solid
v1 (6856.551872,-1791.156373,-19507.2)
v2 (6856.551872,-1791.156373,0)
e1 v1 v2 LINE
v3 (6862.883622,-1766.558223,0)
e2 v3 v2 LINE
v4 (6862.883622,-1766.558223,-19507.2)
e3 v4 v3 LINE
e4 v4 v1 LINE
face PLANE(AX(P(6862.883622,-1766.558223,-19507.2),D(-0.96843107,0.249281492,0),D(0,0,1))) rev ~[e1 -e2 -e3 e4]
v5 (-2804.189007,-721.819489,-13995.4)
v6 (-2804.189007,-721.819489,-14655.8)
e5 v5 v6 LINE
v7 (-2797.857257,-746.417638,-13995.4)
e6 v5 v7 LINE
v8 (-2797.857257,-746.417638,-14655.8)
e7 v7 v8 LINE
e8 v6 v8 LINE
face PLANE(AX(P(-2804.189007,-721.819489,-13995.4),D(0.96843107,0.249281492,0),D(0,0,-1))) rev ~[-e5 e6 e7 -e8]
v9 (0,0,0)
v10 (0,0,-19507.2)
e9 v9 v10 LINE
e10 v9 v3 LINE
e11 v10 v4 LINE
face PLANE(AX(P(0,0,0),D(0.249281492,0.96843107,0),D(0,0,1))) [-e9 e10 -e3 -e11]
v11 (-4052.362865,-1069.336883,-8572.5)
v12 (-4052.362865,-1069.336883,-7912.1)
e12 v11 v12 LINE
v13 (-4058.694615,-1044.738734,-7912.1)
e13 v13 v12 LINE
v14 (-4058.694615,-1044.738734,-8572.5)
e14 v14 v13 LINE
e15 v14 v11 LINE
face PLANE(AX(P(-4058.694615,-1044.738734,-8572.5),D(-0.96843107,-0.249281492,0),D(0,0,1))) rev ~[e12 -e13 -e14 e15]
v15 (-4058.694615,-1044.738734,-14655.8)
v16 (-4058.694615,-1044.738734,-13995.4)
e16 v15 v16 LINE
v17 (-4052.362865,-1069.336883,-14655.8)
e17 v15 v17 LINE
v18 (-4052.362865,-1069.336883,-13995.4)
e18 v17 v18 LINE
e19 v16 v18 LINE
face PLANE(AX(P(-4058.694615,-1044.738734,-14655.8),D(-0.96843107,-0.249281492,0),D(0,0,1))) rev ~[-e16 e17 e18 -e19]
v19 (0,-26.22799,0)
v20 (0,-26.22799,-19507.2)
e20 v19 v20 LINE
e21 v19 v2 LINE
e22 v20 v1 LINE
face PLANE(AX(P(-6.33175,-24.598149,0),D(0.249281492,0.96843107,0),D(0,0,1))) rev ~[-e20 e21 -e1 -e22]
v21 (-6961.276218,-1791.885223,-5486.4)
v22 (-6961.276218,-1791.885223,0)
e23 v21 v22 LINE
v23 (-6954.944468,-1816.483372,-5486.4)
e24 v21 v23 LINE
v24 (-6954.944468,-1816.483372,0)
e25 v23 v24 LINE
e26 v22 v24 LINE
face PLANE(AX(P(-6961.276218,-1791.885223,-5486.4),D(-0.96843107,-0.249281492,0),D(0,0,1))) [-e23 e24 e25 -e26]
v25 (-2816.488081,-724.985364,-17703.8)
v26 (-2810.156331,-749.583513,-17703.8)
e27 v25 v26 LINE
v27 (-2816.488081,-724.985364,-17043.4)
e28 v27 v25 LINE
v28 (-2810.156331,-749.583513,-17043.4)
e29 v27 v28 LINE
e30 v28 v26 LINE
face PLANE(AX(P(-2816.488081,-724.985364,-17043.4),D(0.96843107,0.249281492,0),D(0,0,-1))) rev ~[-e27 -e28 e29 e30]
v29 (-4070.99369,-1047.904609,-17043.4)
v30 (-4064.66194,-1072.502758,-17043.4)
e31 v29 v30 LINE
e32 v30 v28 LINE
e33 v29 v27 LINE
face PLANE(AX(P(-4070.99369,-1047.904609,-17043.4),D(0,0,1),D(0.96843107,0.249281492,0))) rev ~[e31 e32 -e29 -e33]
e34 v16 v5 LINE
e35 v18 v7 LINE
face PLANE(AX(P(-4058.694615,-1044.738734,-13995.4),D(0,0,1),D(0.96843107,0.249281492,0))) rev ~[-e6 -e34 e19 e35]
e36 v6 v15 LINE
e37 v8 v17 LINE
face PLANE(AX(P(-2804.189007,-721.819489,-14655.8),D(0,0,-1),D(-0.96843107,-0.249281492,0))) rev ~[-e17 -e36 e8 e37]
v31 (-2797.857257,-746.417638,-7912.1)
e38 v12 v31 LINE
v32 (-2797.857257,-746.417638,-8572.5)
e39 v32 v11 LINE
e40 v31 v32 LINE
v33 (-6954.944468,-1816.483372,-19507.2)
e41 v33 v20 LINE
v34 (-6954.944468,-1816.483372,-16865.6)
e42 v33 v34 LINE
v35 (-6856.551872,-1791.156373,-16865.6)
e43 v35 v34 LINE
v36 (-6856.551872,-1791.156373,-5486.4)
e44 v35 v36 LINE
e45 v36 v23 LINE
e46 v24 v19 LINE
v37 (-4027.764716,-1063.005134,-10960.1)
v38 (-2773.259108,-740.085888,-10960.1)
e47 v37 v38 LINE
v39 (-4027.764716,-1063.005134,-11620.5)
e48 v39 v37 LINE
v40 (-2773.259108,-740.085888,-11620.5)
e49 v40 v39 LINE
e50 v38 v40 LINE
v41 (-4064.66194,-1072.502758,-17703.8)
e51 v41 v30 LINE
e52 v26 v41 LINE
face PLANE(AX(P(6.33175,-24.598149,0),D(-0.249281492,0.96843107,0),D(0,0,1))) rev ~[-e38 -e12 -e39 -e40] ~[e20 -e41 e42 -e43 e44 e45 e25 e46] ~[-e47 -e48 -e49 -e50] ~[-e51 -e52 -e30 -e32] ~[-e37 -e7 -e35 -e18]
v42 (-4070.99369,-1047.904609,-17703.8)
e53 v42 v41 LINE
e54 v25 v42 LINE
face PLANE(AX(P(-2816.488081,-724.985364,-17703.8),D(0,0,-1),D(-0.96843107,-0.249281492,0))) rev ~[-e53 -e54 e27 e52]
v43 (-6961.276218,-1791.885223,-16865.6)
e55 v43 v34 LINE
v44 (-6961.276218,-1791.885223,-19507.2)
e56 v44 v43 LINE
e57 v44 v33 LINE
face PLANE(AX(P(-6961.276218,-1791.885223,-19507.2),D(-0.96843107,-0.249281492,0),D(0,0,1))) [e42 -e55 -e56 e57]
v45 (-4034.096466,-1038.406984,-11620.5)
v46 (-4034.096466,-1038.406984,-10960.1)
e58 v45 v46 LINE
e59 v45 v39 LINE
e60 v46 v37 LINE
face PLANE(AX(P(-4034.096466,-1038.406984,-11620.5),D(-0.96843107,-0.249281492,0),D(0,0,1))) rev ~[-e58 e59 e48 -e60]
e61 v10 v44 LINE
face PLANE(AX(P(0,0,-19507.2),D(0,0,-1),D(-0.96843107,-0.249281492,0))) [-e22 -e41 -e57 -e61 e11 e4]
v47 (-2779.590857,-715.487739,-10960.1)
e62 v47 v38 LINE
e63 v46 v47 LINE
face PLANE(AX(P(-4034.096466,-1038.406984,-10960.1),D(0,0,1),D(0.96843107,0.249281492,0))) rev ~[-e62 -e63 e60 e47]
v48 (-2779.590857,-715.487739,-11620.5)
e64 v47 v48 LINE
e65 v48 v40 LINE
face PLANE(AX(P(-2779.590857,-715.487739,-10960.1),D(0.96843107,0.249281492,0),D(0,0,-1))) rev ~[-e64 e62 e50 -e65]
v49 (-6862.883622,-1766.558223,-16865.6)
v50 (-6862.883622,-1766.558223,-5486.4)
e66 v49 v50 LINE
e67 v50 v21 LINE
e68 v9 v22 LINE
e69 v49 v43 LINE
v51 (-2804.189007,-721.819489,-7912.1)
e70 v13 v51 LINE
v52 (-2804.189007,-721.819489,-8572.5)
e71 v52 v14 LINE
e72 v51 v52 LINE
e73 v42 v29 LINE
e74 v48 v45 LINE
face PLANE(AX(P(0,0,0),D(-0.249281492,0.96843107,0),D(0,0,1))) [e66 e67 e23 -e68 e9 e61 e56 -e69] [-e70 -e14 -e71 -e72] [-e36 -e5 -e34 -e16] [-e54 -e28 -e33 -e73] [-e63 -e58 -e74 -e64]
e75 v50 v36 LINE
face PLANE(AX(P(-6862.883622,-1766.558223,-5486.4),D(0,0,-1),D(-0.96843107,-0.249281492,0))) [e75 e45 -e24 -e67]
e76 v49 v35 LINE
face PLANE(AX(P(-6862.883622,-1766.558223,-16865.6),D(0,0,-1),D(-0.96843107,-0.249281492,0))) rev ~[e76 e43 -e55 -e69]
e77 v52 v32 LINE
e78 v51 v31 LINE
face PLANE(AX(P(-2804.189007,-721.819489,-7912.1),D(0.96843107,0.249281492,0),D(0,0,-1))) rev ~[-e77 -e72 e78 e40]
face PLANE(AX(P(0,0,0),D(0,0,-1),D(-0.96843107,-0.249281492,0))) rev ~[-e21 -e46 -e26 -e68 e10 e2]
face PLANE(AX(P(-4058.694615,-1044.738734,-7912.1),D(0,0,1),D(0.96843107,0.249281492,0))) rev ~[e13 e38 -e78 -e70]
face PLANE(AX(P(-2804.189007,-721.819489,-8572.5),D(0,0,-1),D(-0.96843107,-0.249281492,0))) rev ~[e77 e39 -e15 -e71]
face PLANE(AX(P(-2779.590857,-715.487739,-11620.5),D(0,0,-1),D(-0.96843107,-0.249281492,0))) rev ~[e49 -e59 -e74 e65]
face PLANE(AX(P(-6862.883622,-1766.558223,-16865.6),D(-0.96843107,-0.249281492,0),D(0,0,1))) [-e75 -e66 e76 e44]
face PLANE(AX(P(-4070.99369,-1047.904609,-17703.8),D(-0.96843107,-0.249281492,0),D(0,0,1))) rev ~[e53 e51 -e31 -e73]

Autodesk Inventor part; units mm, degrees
ref_plane "YZ Plane" through (0, 0, 0) normal (1, 0, 0) x (0, 1, 0)
ref_plane "XY Plane" through (0, 0, 0) normal (0, 0, 1) x (1, 0, 0)
ref_plane "southPlaneOfRoof" through (0, 0, 0) normal (-0.2492815, 0.9684311, 0) x (0, 0, 1)
ref_plane "norhtPlaneOfRoof" through (0, 0, 0) normal (0.2492815, 0.9684311, 0) x (0, 0, 1)
sketch "Sketch3" plane through (0, 0, 0) normal (-0.2492815, 0.9684311, 0) x (0, 0, 1)
  line L0 (0, 0) -> (-19507.2, 0)
  line L1 (-19507.2, 0) -> (-19507.2, -7086.6)
  line L2 (0, 0) -> (0, -7086.6)
  line L3 (0, -7086.6) -> (0, -25.4)
  line L4 (-19507.2, -7086.6) -> (0, -7086.6)
  line L5 (-17703.8, -4203.7) -> (-17043.4, -4203.7)
  line L6 (-17043.4, -4203.7) -> (-17043.4, -2908.3)
  line L7 (-17043.4, -2908.3) -> (-17703.8, -2908.3)
  line L8 (-17703.8, -2908.3) -> (-17703.8, -4203.7)
  line L9 (-14655.8, -4191) -> (-13995.4, -4191)
  line L10 (-13995.4, -4191) -> (-13995.4, -2895.6)
  line L11 (-13995.4, -2895.6) -> (-14655.8, -2895.6)
  line L12 (-14655.8, -2895.6) -> (-14655.8, -4191)
  line L13 (-11620.5, -4165.6) -> (-10960.1, -4165.6)
  line L14 (-10960.1, -4165.6) -> (-10960.1, -2870.2)
  line L15 (-10960.1, -2870.2) -> (-11620.5, -2870.2)
  line L16 (-11620.5, -2870.2) -> (-11620.5, -4165.6)
  line L17 (-8572.5, -4191) -> (-7912.1, -4191)
  line L18 (-7912.1, -4191) -> (-7912.1, -2895.6)
  line L19 (-7912.1, -2895.6) -> (-8572.5, -2895.6)
  line L20 (-8572.5, -2895.6) -> (-8572.5, -4191)
  line L21 (0, -7086.6) -> (0, -7188.2)
  line L22 (-5486.4, -7086.6) -> (-5486.4, -7188.2)
  line L23 (-5486.4, -7188.2) -> (0, -7188.2)
  line L24 (-19507.2, -7086.6) -> (-19507.2, -7188.2)
  line L25 (-16865.6, -7086.6) -> (-16865.6, -7188.2)
  line L26 (-19507.2, -7188.2) -> (-16865.6, -7188.2)
  dimension "d9" = 19507.2
  dimension "d10" = 7086.6
  dimension "d11" = 7061.2
  dimension "d15" = 660.4
  dimension "d16" = 1295.4
  dimension "d17" = 1803.4
  dimension "d18" = 2387.6
  dimension "d19" = 2374.9
  dimension "d20" = 2387.6
  dimension "d21" = 2908.3
  dimension "d22" = 2895.6
  dimension "d23" = 2870.2
  dimension "d24" = 2895.6
  dimension "d29" = 101.6
  dimension "d30" = 5486.4
  dimension "d31" = 101.6
  dimension "d32" = 2641.6
sketch "Sketch4" plane through (0, 0, 0) normal (0.2492815, 0.9684311, 0) x (0, 0, 1)
  line L0 (0, 0) -> (0, 7086.6)
  line L1 (0, 0) -> (-19507.2, 0)
  line L2 (-19507.2, 0) -> (-19507.2, 7086.6)
  line L3 (-19507.2, 7086.6) -> (0, 7086.6)
  dimension "d12" = 7086.6
  dimension "d13" = 19507.2
  dimension "d14" = 7086.6
extrude "Extrusion2" add sketch "Sketch3" against normal blind 25.4
extrude "Extrusion3" add sketch "Sketch4" against normal blind 25.4
equation "\"pitch_4_12\" = 14.435deg"
equation "\"d7\" = pitch_4_12"
equation "\"d8\" = -pitch_4_12"
properties part number "garageRoof"
